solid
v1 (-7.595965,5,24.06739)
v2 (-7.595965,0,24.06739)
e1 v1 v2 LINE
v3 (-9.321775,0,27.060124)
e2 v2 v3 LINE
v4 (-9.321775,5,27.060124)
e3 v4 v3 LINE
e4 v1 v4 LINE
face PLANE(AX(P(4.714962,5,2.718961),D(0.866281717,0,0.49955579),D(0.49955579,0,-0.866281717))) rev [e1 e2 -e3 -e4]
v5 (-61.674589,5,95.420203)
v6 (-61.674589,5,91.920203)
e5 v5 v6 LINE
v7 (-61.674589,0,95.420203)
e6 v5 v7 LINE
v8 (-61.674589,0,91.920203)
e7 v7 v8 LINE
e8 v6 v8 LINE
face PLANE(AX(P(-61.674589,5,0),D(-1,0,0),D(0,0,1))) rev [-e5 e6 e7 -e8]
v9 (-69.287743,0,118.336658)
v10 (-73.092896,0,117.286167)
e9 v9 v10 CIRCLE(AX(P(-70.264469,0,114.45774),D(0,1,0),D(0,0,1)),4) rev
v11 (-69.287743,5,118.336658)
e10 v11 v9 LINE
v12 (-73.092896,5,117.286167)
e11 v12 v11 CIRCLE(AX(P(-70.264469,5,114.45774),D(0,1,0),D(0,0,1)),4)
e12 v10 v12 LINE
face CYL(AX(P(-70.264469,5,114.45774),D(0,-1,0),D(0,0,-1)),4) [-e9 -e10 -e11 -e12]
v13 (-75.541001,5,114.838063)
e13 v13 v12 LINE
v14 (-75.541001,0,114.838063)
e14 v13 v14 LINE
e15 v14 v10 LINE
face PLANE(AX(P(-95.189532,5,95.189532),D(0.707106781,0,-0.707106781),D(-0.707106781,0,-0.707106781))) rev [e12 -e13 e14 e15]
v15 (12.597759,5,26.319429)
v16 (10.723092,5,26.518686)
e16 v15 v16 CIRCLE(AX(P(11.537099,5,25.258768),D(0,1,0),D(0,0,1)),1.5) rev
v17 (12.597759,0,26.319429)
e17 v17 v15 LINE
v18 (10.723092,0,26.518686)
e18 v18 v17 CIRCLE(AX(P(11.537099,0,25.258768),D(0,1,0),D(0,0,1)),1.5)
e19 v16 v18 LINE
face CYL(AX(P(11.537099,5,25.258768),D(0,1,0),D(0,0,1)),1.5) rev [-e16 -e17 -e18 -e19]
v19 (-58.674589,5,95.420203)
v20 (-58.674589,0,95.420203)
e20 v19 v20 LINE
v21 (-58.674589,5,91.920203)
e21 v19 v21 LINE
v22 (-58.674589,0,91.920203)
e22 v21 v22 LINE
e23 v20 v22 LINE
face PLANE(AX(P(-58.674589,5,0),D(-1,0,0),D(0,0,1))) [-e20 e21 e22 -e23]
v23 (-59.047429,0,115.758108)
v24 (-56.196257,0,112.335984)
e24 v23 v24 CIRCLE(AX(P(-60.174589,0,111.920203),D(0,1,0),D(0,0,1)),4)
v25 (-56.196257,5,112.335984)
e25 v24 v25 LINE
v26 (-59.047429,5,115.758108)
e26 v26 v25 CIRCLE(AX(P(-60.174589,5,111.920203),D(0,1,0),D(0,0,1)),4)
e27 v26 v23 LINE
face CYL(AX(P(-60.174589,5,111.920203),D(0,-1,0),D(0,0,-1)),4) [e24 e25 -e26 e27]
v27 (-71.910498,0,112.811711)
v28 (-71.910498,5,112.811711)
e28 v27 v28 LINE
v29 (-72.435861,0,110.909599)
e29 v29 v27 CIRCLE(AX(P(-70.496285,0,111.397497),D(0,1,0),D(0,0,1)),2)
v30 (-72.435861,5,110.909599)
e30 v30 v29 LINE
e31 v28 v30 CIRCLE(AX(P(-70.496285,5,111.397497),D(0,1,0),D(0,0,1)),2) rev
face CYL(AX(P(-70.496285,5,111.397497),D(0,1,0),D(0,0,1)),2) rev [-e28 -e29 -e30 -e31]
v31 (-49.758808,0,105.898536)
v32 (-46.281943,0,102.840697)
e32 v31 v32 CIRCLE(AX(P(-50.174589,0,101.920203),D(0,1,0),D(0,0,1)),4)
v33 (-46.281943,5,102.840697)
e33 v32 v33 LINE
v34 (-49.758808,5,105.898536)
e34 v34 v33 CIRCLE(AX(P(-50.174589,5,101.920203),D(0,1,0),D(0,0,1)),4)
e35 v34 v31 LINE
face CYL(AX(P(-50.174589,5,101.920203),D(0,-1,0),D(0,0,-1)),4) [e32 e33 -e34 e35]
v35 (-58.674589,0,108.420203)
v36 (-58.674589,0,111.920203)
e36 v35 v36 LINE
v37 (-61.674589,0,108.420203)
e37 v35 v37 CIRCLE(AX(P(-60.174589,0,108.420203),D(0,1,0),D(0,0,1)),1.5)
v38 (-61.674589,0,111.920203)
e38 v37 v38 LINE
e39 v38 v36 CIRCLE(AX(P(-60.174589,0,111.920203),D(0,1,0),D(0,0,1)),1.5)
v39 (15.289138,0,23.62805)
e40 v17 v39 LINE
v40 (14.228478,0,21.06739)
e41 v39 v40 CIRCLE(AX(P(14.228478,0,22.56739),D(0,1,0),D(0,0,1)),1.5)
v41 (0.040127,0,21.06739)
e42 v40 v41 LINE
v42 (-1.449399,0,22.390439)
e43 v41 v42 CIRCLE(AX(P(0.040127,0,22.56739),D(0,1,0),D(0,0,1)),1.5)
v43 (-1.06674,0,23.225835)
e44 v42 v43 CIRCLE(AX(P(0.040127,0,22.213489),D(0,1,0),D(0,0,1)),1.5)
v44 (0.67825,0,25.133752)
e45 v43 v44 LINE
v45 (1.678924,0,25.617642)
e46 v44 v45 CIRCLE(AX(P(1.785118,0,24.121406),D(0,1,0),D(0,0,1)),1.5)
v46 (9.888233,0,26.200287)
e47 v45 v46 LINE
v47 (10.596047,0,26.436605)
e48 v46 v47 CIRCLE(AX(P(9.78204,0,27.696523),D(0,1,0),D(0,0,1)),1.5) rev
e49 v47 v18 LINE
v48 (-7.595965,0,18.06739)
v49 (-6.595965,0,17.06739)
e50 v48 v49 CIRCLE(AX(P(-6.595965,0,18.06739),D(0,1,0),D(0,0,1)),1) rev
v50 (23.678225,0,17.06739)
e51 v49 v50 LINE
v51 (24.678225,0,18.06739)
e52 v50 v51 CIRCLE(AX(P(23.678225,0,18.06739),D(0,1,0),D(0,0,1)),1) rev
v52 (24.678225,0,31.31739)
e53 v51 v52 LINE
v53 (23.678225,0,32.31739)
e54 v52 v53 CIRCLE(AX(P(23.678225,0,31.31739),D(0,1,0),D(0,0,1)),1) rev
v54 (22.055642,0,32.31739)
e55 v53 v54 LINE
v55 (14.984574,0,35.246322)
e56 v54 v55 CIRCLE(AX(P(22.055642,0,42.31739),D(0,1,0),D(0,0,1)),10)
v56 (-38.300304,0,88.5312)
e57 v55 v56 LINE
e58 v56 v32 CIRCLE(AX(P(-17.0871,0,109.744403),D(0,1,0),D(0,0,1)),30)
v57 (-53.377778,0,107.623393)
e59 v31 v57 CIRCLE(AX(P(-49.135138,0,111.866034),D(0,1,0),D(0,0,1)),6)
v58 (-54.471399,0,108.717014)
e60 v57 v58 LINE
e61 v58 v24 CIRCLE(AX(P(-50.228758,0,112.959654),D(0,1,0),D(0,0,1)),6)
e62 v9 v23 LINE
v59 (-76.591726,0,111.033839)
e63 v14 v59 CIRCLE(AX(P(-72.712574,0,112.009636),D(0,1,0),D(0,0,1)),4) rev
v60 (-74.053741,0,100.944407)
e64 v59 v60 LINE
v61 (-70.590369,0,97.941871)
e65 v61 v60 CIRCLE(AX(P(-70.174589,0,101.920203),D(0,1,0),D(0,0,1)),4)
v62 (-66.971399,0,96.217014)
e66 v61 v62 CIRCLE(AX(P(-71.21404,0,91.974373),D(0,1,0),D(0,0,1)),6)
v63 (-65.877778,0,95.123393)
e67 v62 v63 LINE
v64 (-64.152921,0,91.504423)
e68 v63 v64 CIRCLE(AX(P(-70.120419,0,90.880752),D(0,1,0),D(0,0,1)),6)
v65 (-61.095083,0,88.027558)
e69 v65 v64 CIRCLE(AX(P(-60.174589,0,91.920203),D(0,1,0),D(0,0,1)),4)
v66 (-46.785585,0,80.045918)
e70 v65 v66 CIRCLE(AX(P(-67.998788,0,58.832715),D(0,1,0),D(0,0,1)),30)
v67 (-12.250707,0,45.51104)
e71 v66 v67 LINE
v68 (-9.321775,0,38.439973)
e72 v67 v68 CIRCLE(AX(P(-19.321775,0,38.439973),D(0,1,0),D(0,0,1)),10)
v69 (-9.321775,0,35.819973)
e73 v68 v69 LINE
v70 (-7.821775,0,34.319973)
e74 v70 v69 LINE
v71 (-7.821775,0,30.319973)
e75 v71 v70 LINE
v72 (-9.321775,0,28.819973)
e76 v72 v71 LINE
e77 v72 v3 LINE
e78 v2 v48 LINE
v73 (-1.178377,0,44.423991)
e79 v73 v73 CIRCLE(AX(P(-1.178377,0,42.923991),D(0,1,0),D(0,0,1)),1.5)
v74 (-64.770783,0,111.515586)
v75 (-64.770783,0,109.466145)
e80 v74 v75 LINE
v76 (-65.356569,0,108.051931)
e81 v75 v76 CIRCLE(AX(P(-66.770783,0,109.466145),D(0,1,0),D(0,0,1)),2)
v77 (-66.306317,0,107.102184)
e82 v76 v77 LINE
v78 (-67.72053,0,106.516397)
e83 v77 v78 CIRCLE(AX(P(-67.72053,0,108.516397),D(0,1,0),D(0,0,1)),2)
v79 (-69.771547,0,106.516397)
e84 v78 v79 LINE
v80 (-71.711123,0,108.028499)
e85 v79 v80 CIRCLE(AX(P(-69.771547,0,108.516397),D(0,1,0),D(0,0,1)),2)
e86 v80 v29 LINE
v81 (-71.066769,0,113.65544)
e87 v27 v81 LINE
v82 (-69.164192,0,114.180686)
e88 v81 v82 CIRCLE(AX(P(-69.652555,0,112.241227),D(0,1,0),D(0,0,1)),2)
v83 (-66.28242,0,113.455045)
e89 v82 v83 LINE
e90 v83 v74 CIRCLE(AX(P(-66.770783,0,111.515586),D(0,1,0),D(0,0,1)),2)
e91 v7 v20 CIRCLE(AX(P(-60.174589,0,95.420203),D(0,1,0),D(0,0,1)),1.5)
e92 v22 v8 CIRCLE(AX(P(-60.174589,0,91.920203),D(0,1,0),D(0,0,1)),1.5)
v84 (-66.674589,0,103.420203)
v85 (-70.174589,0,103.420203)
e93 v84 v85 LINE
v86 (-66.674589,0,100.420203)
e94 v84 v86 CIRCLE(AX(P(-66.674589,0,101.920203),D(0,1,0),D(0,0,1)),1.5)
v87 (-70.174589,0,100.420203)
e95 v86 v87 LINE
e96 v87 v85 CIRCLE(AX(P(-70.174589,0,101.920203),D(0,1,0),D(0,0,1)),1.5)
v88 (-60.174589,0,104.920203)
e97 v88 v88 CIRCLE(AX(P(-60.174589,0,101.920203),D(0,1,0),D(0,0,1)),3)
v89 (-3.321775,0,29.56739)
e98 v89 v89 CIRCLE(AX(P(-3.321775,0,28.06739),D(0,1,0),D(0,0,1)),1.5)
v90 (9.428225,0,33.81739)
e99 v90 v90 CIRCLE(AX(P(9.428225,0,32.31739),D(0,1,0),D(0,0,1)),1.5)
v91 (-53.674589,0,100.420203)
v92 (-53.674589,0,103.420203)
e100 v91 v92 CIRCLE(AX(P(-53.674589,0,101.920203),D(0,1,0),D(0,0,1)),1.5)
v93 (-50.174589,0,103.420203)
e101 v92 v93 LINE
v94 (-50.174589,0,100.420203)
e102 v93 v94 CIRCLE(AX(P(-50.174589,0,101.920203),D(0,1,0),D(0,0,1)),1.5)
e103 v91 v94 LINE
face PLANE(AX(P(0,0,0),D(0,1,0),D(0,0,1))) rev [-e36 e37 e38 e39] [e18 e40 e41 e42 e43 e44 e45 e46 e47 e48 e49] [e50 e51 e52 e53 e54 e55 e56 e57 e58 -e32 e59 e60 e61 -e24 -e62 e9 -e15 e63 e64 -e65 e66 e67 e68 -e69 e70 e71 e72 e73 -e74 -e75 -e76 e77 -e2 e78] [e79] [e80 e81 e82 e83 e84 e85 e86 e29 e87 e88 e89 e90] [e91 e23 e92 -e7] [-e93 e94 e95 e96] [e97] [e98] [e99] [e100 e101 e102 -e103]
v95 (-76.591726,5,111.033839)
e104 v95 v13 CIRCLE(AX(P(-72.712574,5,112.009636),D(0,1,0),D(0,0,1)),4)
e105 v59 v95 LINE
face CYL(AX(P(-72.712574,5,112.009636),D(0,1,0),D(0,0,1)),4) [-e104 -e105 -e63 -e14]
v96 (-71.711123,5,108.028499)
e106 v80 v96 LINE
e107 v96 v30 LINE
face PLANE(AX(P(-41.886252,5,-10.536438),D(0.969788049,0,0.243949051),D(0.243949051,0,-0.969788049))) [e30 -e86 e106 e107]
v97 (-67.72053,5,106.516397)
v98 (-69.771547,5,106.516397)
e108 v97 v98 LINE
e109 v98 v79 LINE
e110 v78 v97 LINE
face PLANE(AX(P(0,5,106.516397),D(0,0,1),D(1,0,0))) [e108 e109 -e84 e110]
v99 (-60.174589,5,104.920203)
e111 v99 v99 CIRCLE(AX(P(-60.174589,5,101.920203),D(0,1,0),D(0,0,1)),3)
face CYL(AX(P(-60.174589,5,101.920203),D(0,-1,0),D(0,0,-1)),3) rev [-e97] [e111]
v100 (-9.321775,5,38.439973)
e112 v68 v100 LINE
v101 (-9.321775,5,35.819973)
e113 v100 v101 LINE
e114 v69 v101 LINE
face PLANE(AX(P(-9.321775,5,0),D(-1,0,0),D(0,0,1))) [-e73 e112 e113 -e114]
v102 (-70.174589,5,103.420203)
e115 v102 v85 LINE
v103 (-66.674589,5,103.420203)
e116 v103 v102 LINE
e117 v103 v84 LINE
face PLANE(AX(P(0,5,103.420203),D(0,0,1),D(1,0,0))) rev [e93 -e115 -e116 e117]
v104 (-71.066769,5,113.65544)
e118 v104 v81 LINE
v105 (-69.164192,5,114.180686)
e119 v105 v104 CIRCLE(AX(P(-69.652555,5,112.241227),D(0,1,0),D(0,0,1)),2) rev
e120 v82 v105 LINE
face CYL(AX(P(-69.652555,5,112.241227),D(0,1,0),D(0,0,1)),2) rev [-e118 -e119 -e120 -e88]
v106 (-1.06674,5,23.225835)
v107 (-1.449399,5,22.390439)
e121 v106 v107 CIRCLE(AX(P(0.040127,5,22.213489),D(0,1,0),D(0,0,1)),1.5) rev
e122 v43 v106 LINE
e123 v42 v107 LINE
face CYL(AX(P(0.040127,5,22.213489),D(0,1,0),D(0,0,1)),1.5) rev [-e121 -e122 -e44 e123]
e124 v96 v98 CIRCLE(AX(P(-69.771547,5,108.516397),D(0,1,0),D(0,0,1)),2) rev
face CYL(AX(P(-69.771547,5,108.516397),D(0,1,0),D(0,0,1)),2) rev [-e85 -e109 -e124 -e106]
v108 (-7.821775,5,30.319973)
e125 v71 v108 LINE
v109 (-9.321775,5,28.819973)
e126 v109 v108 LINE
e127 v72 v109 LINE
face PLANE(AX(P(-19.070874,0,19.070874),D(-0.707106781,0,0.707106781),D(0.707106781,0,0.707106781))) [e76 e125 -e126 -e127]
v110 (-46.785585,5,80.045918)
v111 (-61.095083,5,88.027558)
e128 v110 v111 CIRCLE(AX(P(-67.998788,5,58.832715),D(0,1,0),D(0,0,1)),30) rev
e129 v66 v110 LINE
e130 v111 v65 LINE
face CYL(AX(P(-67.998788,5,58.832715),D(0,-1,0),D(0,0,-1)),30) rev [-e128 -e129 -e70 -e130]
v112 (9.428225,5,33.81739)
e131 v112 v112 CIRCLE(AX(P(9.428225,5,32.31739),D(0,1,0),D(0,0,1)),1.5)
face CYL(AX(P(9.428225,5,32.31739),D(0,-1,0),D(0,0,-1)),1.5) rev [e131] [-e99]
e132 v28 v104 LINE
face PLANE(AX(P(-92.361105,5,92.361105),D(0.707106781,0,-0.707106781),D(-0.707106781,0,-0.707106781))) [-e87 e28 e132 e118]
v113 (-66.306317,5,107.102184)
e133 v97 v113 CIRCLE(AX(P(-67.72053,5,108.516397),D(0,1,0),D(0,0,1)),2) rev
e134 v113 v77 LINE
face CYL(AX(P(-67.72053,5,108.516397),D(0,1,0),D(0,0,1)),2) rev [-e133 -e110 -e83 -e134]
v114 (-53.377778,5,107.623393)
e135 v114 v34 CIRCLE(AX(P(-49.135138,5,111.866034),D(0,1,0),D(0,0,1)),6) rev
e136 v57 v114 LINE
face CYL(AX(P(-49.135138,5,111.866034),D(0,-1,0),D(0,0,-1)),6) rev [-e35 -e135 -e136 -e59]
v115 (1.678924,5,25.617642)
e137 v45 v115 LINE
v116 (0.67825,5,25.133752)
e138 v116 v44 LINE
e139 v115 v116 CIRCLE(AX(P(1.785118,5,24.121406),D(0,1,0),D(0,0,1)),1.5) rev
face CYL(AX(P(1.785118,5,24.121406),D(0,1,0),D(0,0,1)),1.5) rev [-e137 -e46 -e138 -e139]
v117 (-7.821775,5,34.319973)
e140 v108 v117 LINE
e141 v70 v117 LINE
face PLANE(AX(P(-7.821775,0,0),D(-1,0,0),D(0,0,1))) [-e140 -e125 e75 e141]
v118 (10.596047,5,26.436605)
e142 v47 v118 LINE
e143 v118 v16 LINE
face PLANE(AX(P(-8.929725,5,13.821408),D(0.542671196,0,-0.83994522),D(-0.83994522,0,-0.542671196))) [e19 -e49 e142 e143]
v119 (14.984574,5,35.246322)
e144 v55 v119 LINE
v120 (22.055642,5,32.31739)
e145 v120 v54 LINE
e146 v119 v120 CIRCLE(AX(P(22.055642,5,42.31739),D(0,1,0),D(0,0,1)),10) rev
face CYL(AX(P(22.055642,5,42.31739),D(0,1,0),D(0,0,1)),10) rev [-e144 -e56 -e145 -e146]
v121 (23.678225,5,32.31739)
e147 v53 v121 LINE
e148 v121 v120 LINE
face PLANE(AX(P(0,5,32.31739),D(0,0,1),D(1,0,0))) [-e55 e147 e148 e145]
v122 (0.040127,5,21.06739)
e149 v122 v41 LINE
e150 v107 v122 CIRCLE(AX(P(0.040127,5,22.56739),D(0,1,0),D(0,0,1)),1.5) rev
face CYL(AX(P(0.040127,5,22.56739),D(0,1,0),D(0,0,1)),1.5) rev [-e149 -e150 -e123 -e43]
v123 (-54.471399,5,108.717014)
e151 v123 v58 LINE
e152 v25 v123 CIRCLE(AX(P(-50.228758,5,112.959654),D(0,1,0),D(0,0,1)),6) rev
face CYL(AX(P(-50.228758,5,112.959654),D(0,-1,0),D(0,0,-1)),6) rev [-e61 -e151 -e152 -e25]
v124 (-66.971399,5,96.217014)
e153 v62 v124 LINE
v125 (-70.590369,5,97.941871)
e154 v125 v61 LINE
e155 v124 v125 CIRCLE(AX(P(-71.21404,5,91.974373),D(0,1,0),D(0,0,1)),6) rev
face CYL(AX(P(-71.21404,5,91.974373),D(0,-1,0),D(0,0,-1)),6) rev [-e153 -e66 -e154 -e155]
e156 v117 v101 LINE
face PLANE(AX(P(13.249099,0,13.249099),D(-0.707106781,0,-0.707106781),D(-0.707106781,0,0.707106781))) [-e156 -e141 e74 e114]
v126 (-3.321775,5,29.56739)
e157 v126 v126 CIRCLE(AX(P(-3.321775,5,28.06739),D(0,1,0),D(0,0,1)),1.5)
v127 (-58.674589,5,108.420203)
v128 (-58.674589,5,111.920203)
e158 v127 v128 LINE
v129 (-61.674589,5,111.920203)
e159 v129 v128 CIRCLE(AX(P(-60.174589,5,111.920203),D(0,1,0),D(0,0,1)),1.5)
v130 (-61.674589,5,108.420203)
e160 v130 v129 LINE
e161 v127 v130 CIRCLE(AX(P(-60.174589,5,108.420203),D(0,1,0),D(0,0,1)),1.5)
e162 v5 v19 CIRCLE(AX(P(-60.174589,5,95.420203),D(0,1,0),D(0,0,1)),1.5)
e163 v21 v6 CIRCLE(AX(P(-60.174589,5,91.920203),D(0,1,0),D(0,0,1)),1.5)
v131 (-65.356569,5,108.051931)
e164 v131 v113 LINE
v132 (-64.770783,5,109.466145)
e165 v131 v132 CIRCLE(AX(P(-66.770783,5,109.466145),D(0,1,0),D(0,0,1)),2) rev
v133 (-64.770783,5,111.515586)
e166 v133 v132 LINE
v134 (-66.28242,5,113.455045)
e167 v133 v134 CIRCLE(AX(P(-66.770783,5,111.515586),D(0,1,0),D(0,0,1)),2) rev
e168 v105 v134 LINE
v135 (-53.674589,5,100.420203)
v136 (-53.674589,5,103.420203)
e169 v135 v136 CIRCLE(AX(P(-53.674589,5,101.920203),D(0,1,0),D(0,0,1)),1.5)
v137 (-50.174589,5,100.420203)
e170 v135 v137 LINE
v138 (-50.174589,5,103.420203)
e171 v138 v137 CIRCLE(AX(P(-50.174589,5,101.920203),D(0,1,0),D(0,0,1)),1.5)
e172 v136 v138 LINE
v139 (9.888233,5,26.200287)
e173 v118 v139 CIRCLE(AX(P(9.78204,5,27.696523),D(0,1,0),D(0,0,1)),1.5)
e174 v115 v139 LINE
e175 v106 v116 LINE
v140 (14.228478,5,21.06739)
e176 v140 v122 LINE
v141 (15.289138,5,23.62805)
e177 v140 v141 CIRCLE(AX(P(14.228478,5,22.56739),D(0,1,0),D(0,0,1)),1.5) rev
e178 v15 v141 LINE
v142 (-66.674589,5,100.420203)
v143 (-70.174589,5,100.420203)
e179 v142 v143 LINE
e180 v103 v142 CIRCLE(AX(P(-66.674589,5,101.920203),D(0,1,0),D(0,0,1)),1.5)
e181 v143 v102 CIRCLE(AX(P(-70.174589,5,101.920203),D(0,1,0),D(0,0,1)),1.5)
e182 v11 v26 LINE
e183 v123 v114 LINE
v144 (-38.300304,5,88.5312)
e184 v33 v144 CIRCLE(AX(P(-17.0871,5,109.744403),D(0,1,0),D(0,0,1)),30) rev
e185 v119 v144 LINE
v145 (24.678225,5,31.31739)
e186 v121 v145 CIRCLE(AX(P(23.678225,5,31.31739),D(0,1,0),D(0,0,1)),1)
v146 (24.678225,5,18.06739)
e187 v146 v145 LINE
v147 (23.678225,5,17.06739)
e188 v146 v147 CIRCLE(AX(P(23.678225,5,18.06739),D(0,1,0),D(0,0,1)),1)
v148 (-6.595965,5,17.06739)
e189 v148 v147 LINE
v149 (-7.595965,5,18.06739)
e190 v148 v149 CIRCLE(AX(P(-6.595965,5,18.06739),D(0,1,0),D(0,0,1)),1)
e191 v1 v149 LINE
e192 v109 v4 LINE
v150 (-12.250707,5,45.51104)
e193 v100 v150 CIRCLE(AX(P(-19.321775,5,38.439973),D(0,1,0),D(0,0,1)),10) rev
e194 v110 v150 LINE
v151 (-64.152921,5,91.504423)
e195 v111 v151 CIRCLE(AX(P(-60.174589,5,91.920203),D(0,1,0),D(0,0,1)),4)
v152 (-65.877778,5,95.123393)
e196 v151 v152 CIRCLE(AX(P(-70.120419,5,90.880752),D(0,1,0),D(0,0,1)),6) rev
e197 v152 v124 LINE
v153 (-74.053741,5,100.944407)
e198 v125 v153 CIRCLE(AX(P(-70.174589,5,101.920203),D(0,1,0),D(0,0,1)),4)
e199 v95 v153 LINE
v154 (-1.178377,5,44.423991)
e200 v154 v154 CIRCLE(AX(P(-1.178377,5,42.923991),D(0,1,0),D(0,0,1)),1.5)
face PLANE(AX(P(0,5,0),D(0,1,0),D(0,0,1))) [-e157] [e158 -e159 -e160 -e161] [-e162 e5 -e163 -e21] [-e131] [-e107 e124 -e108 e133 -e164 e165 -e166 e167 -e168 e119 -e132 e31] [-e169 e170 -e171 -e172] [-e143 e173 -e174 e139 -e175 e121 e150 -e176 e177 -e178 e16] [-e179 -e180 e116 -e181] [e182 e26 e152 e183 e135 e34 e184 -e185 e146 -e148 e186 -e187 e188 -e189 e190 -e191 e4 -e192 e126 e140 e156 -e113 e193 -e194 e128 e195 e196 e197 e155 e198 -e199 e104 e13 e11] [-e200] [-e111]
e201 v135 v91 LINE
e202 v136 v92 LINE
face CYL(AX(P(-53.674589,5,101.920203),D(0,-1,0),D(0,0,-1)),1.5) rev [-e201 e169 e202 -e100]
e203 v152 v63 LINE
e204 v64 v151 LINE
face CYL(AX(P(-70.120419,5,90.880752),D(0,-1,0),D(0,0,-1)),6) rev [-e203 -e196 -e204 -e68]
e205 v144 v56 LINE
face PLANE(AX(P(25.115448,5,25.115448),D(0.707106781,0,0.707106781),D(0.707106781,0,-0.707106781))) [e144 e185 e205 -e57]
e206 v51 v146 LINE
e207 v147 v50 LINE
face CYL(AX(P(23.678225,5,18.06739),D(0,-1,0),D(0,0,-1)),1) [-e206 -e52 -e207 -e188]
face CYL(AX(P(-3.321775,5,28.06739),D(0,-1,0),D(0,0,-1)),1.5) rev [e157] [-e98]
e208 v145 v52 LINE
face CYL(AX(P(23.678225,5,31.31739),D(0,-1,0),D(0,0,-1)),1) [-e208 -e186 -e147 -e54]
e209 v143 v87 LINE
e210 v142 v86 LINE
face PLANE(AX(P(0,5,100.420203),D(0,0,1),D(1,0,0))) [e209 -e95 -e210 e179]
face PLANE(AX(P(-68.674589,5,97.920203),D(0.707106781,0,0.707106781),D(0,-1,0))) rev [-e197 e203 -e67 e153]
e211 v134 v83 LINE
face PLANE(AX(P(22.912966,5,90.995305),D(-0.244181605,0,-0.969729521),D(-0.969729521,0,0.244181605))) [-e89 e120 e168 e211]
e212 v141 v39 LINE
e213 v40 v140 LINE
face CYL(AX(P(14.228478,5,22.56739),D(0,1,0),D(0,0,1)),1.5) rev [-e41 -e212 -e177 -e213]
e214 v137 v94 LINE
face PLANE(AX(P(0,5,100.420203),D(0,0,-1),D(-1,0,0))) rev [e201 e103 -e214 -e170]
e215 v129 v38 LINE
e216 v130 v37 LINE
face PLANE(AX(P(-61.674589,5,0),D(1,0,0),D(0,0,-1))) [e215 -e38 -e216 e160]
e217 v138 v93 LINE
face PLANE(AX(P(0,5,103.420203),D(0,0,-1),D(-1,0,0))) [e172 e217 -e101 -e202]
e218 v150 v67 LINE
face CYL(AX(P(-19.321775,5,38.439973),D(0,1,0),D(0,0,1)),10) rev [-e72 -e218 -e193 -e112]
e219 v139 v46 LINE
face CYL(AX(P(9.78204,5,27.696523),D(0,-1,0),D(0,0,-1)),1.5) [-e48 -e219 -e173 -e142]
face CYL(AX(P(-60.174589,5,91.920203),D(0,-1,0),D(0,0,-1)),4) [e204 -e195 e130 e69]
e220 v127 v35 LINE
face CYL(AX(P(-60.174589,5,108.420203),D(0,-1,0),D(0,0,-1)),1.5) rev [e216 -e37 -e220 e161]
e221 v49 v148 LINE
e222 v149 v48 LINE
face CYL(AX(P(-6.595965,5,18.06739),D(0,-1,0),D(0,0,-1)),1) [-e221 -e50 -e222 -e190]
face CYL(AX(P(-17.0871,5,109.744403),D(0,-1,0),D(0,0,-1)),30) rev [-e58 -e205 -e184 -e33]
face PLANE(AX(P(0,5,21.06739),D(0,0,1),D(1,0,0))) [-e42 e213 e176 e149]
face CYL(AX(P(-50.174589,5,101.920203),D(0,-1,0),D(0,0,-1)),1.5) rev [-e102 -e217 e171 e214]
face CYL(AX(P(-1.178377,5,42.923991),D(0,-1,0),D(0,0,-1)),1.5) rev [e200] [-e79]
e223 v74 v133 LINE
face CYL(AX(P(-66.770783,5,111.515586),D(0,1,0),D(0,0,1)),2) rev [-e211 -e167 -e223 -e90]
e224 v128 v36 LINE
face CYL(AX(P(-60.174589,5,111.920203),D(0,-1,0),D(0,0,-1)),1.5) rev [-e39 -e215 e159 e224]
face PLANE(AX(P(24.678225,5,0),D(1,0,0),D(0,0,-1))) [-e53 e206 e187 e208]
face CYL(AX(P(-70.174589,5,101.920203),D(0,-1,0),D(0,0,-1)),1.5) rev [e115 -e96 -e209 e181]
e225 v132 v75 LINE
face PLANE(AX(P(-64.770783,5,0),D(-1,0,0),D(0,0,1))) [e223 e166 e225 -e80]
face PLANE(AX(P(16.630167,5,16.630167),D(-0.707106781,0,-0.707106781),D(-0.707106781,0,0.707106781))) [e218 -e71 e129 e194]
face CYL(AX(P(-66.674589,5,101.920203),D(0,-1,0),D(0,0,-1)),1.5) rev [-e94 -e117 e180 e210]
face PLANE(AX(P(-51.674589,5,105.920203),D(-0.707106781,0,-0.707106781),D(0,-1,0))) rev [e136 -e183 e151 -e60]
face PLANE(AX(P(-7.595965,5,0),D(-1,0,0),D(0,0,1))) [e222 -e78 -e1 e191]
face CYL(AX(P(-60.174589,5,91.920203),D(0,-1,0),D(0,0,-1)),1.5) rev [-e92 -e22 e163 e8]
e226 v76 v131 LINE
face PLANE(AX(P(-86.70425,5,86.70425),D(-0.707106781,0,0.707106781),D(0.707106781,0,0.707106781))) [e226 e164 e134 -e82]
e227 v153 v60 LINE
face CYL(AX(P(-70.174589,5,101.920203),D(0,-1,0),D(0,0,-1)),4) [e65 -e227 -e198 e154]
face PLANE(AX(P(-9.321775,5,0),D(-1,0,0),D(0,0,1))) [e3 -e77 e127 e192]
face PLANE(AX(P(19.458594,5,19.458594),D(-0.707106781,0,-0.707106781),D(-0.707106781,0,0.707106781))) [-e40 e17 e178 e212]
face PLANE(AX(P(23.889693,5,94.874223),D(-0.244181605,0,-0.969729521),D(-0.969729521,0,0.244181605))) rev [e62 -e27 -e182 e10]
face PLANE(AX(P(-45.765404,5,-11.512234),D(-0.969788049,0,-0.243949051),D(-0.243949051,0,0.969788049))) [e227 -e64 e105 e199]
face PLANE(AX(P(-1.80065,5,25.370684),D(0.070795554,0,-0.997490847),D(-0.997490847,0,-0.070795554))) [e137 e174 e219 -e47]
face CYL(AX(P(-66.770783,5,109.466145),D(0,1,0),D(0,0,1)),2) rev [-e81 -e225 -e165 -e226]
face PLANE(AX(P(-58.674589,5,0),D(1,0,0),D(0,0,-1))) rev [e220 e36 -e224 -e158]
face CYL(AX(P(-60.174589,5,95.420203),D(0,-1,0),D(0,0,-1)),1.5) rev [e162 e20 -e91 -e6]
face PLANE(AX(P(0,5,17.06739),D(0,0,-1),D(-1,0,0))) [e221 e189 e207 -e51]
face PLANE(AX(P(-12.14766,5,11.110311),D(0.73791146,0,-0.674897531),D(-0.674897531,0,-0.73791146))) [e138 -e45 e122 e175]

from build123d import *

# Parameters (mm, degrees)
SKETCH2_R           = 3.0000000000000018
SKETCH2_R_2         = 1.4999999999993736
SKETCH2_R_3         = 1.5000000000000009
SKETCH2_R_4         = 1.4999999999993723
BOSS_EXTRUDE1_DEPTH = 5
FILLET1_R           = 1.5
FILLET3_R           = 10
FILLET5_R           = 10
CHAMFER1_SIZE       = 4.5
FILLET6_R           = 6
FILLET7_R           = 4
FILLET8_R           = 2
FILLET9_R           = 30
CUT_EXTRUDE1_DEPTH  = 142.21634167657882
FILLET10_R          = 1


with BuildPart() as part:
    # Sketch2 → Boss-Extrude1 (new body)
    with BuildSketch(Plane(origin=(0, 0, 0), x_dir=(1, 0, 0), z_dir=(0, 1, 0))):
        with BuildLine():
            Line((-46.189355852298796, -96.42025186017804), (-39.496927389393186, -89.72782339727232))
            Line((-39.496927389393186, -89.72782339727232), (17.913506363615255, -32.31738964426288))
            Line((17.913506363615255, -32.31738964426288), (24.678224989376695, -32.31738964426288))
            Line((24.678224989376695, -32.31738964426288), (24.678224989376428, -17.06738964426295))
            Line((24.678224989376428, -17.06738964426295), (-7.595965049770856, -17.06738964426337))
            Line((-7.595965049770856, -17.06738964426337), (-7.595965049770857, -24.067389644263372))
            Line((-7.595965049770857, -24.067389644263372), (-9.321775010623746, -27.06012368042446))
            Line((-9.321775010623746, -27.06012368042446), (-9.32177501062375, -37.06738964426337))
            Line((-9.32177501062375, -37.06738964426337), (-9.321775010623757, -42.58210827002507))
            Line((-9.321775010623753, -42.58210827002507), (-54.6598701272448, -87.9202033866469))
            Line((-54.6598701272448, -87.9202033866469), (-60.17458875300816, -87.92020338664692))
            ThreePointArc((-60.17458875300816, -87.92020338664692), (-63.00301587775435, -89.09177626190073), (-64.17458875300817, -91.92020338664692))
            Line((-64.17458875300817, -91.92020338664692), (-64.17458875300817, -97.92020338664689))
            Line((-64.17458875300817, -97.92020338664689), (-70.17458875301077, -97.92020338664689))
            ThreePointArc((-70.17458875301077, -97.92020338664689), (-72.6339398041774, -98.76558892412923), (-74.05374095021992, -100.9444071830841))
            Line((-74.05374095021992, -100.9444071830841), (-77.14515150148509, -113.23391188563446))
            Line((-77.14515150148509, -113.23391188563446), (-71.4882972519927, -118.89076613512684))
            Line((-71.4882972519927, -118.89076613512684), (-59.047429208957894, -115.75810794021132))
            ThreePointArc((-59.047429208957894, -115.75810794021132), (-56.9723521770992, -114.3172183869977), (-56.174588753010745, -111.92020338664949))
            Line((-56.174588753010745, -111.92020338664949), (-56.174588753010745, -105.92020338664949))
            Line((-56.174588753010745, -105.92020338664949), (-50.174588753008145, -105.92020338664949))
            ThreePointArc((-50.174588753008145, -105.92020338664949), (-47.34616162826196, -104.74863051139567), (-46.174588753008145, -101.92020338664949))
            Line((-46.174588753008145, -101.92020338664949), (-46.17464642427909, -101.89872393503671))
            Line((-46.17464642427909, -101.89872393503671), (-46.189355852298796, -96.42025186017804))
        make_face()
        Polygon((-70.26446914062754, -114.4577399969996), (-72.71257361922765, -112.00963551839949), (-71.33075600396296, -106.51639746436214), (-66.89210317428027, -106.51639746436214), (-64.77078283072062, -108.63771780792177), (-64.7707828307206, -113.0744087552009), align=None, mode=Mode.SUBTRACT)
        with BuildLine():
            ThreePointArc((-61.67458875301074, -108.42020338664949), (-60.17458875301075, -106.92020338664949), (-58.67458875301077, -108.42020338664949))
            Line((-58.67458875301077, -108.42020338664949), (-58.674588753010774, -111.92020338664949))
            ThreePointArc((-58.674588753010774, -111.92020338664949), (-60.17458875301075, -113.42020338664946), (-61.67458875301073, -111.92020338664949))
            Line((-61.67458875301073, -111.92020338664949), (-61.67458875301074, -108.42020338664949))
        make_face(mode=Mode.SUBTRACT)
        with BuildLine():
            ThreePointArc((-66.67458875301074, -100.42020338664692), (-65.17458875301071, -101.92020338664692), (-66.67458875301074, -103.42020338664692))
            Line((-66.67458875301074, -103.42020338664692), (-70.17458875301077, -103.42020338664692))
            ThreePointArc((-70.17458875301077, -103.42020338664692), (-71.67458875301075, -101.92020338664692), (-70.17458875301077, -100.42020338664692))
            Line((-70.17458875301077, -100.4202033866469), (-66.67458875301074, -100.4202033866469))
        make_face(mode=Mode.SUBTRACT)
        with Locations(Location((-60.174588753008145, -101.92020338664949, 0), (0, 0, 270))):
            Circle(SKETCH2_R, mode=Mode.SUBTRACT)
        with BuildLine():
            ThreePointArc((-53.67458875300815, -103.42020338664949), (-55.17458875300815, -101.92020338664949), (-53.67458875300815, -100.42020338664949))
            Line((-53.67458875300815, -100.42020338664949), (-50.174588753008145, -100.42020338664949))
            ThreePointArc((-50.174588753008145, -100.42020338664949), (-48.67458875300816, -101.92020338664949), (-50.174588753008145, -103.42020338664949))
            Line((-50.174588753008145, -103.42020338664949), (-53.67458875300815, -103.42020338664949))
        make_face(mode=Mode.SUBTRACT)
        with BuildLine():
            ThreePointArc((-58.67458875300815, -95.42020338664692), (-60.17458875300815, -96.9202033866469), (-61.67458875300815, -95.42020338664692))
            Line((-61.674588753008145, -95.42020338664692), (-61.67458875300816, -91.92020338664692))
            ThreePointArc((-61.67458875300816, -91.92020338664692), (-60.174588753008145, -90.42020338664689), (-58.67458875300813, -91.92020338664692))
            Line((-58.67458875300813, -91.92020338664692), (-58.674588753008145, -95.42020338664692))
        make_face(mode=Mode.SUBTRACT)
        with Locations(Location((-1.1783767284213562, -42.92399136206118, 0), (0, 0, 270))):
            Circle(SKETCH2_R_2, mode=Mode.SUBTRACT)
        with Locations(Location((-3.3217750106237407, -28.067389644263372, 0), (0, 0, 270))):
            Circle(SKETCH2_R_3, mode=Mode.SUBTRACT)
        with Locations(Location((9.428224989376764, -32.31738964426288, 0), (0, 0, 270))):
            Circle(SKETCH2_R_4, mode=Mode.SUBTRACT)
        Polygon((1.0820753752795897, -25.575281589539195), (-1.459873180493811, -22.79599601598655), (-1.4598731804937872, -21.06738964426295), (17.849797864630506, -21.06738964426295), (11.740910030340089, -27.17627747855337), (10.272484798754686, -26.22755837455273), align=None, mode=Mode.SUBTRACT)
    extrude(amount=BOSS_EXTRUDE1_DEPTH)

    # Fillet1
    # the kernel refuses this fillet: 1.5 mm, written as the material it adds along each edge
    with BuildSketch(Plane(origin=(1.0820753752795897, 0, 25.575281589539195), x_dir=(0.9974908468725838, 0, 0.07079555357093803), z_dir=(0, 1, 0))) as fillet1_piece_1:
        with BuildLine():
            CenterArc((FILLET1_R * 0.398900109333, FILLET1_R), FILLET1_R, 226.50587582859146, 43.4941241714086)
            Line((-FILLET1_R * 0.289380073746, FILLET1_R * 0.274555040282), (0, 0))
            Line((0, 0), (FILLET1_R * 0.398900109333, 0))
        make_face()
    extrude(amount=5)
    with BuildSketch(Plane(origin=(-1.459873180493811, 0, 22.79599601598655), x_dir=(1.372e-14, 0, -1), z_dir=(0, 1, 0))) as fillet1_piece_2:
        with BuildLine():
            CenterArc((FILLET1_R * 0.388338270451, -FILLET1_R), FILLET1_R, 89.99999999999997, 42.44619337739144)
            Line((-FILLET1_R * 0.286559260205, -FILLET1_R * 0.262088539786), (0, 0))
            Line((0, 0), (FILLET1_R * 0.388338270451, 0))
        make_face()
    extrude(amount=5)
    with BuildSketch(Plane(origin=(-1.459873180493787, 0, 21.06738964426295), x_dir=(1, 0, 0), z_dir=(0, 1, 0))) as fillet1_piece_3:
        with BuildLine():
            CenterArc((FILLET1_R, -FILLET1_R), FILLET1_R, 90, 89.99999999999918)
            Line((-2.087e-14, -FILLET1_R), (0, 0))
            Line((0, 0), (FILLET1_R, 0))
        make_face()
    extrude(amount=5)
    with BuildSketch(Plane(origin=(11.740910030340089, 0, 27.17627747855337), x_dir=(-0.839945220222329, 0, -0.5426711960530642), z_dir=(0, 1, 0))) as fillet1_piece_4:
        with BuildLine():
            CenterArc((FILLET1_R * 0.807844840446, -FILLET1_R), FILLET1_R, 89.99999999999994, 77.86566453571226)
            Line((-FILLET1_R * 0.169812603282, -FILLET1_R * 0.789795521639), (0, 0))
            Line((0, 0), (FILLET1_R * 0.807844840446, -3e-17))
        make_face()
    extrude(amount=5)
    with BuildSketch(Plane(origin=(17.849797864630506, 0, 21.06738964426295), x_dir=(-0.7071067811865475, 0, 0.7071067811865475), z_dir=(0, 1, 0))) as fillet1_piece_5:
        with BuildLine():
            CenterArc((FILLET1_R * 2.41421356237, -FILLET1_R), FILLET1_R, 89.99999999999994, 135.00000000000006)
            Line((FILLET1_R * 1.70710678119, -FILLET1_R * 1.70710678119), (0, 0))
            Line((0, 0), (FILLET1_R * 2.41421356237, 1e-17))
        make_face()
    extrude(amount=5)
    # the kernel refuses this fillet: 1.5 mm, written as the material it takes off along each edge
    with BuildSketch(Plane(origin=(10.27248479875469, -0.9630450228974294, 26.22755837455273), x_dir=(0.8399452202223279, 0, 0.5426711960530661), z_dir=(0, 1, 0))) as fillet1_2_piece_1:
        with BuildLine():
            CenterArc((FILLET1_R * 0.256812006106, -FILLET1_R), FILLET1_R, 90.00000000000006, 28.805982084511456)
            Line((-FILLET1_R * 0.225033157983, -FILLET1_R * 0.123743623222), (0, 0))
            Line((0, 0), (FILLET1_R * 0.256812006106, 2e-17))
        make_face()
    extrude(amount=6.92609004579486, mode=Mode.SUBTRACT)

    # Fillet3
    fillet3_edges = [part.edges().sort_by_distance(p)[0] for p in [
        (17.913506363615255, 2.5, 32.31738964426288),
    ]]
    fillet(fillet3_edges, radius=FILLET3_R)

    # Fillet5
    fillet5_edges = [part.edges().sort_by_distance(p)[0] for p in [
        (-9.321775010623755, 2.5, 42.58210827002507),
    ]]
    fillet(fillet5_edges, radius=FILLET5_R)

    # Chamfer1
    chamfer1_edges = [part.edges().sort_by_distance(p)[0] for p in [
        (-64.17458875300817, 2.5, 97.92020338664689),
        (-56.174588753010745, 2.5, 105.92020338664949),
    ]]
    chamfer(chamfer1_edges, length=CHAMFER1_SIZE)

    # Fillet6
    fillet6_edges = [part.edges().sort_by_distance(p)[0] for p in [
        (-64.17458875300817, 2.5, 93.42020338664689),
        (-68.67458875300817, 2.5, 97.92020338664689),
        (-56.174588753010745, 2.5, 110.42020338664949),
        (-51.674588753010745, 2.5, 105.92020338664949),
    ]]
    fillet(fillet6_edges, radius=FILLET6_R)

    # Fillet7
    fillet7_edges = [part.edges().sort_by_distance(p)[0] for p in [
        (-71.4882972519927, 2.5, 118.89076613512684),
        (-77.14515150148509, 2.5, 113.23391188563446),
    ]]
    fillet(fillet7_edges, radius=FILLET7_R)

    # Fillet8
    fillet8_edges = [part.edges().sort_by_distance(p)[0] for p in [
        (-72.71257361922765, 2.5, 112.00963551839949),
        (-70.26446914062754, 2.5, 114.4577399969996),
        (-64.7707828307206, 2.5, 113.0744087552009),
        (-64.77078283072062, 2.5, 108.63771780792177),
        (-66.89210317428027, 2.5, 106.51639746436214),
        (-71.33075600396296, 2.5, 106.51639746436214),
    ]]
    fillet(fillet8_edges, radius=FILLET8_R)

    # Fillet9
    fillet9_edges = [part.edges().sort_by_distance(p)[0] for p in [
        (-54.6598701272448, 2.5, 87.9202033866469),
        (-46.189355852298796, 2.5, 96.42025186017804),
    ]]
    fillet(fillet9_edges, radius=FILLET9_R)

    # Sketch4 → Cut-Extrude1 (cut, through all)
    with BuildSketch(Plane(origin=(0, 5, 0), x_dir=(1, 0, 0), z_dir=(0, 1, 0))):
        Polygon((-9.321775010623751, -28.81997264629415), (-7.82177501062375, -30.31997264629416), (-7.821775010623751, -34.31997264629416), (-9.321775010623751, -35.819972646294175), align=None)
    extrude(amount=-CUT_EXTRUDE1_DEPTH, mode=Mode.SUBTRACT)

    # Fillet10
    fillet10_edges = [part.edges().sort_by_distance(p)[0] for p in [
        (-7.595965049770856, 2.5, 17.06738964426337),
        (24.678224989376428, 2.5, 17.06738964426295),
        (24.678224989376695, 2.5, 32.31738964426288),
    ]]
    fillet(fillet10_edges, radius=FILLET10_R)


solid = part.part
